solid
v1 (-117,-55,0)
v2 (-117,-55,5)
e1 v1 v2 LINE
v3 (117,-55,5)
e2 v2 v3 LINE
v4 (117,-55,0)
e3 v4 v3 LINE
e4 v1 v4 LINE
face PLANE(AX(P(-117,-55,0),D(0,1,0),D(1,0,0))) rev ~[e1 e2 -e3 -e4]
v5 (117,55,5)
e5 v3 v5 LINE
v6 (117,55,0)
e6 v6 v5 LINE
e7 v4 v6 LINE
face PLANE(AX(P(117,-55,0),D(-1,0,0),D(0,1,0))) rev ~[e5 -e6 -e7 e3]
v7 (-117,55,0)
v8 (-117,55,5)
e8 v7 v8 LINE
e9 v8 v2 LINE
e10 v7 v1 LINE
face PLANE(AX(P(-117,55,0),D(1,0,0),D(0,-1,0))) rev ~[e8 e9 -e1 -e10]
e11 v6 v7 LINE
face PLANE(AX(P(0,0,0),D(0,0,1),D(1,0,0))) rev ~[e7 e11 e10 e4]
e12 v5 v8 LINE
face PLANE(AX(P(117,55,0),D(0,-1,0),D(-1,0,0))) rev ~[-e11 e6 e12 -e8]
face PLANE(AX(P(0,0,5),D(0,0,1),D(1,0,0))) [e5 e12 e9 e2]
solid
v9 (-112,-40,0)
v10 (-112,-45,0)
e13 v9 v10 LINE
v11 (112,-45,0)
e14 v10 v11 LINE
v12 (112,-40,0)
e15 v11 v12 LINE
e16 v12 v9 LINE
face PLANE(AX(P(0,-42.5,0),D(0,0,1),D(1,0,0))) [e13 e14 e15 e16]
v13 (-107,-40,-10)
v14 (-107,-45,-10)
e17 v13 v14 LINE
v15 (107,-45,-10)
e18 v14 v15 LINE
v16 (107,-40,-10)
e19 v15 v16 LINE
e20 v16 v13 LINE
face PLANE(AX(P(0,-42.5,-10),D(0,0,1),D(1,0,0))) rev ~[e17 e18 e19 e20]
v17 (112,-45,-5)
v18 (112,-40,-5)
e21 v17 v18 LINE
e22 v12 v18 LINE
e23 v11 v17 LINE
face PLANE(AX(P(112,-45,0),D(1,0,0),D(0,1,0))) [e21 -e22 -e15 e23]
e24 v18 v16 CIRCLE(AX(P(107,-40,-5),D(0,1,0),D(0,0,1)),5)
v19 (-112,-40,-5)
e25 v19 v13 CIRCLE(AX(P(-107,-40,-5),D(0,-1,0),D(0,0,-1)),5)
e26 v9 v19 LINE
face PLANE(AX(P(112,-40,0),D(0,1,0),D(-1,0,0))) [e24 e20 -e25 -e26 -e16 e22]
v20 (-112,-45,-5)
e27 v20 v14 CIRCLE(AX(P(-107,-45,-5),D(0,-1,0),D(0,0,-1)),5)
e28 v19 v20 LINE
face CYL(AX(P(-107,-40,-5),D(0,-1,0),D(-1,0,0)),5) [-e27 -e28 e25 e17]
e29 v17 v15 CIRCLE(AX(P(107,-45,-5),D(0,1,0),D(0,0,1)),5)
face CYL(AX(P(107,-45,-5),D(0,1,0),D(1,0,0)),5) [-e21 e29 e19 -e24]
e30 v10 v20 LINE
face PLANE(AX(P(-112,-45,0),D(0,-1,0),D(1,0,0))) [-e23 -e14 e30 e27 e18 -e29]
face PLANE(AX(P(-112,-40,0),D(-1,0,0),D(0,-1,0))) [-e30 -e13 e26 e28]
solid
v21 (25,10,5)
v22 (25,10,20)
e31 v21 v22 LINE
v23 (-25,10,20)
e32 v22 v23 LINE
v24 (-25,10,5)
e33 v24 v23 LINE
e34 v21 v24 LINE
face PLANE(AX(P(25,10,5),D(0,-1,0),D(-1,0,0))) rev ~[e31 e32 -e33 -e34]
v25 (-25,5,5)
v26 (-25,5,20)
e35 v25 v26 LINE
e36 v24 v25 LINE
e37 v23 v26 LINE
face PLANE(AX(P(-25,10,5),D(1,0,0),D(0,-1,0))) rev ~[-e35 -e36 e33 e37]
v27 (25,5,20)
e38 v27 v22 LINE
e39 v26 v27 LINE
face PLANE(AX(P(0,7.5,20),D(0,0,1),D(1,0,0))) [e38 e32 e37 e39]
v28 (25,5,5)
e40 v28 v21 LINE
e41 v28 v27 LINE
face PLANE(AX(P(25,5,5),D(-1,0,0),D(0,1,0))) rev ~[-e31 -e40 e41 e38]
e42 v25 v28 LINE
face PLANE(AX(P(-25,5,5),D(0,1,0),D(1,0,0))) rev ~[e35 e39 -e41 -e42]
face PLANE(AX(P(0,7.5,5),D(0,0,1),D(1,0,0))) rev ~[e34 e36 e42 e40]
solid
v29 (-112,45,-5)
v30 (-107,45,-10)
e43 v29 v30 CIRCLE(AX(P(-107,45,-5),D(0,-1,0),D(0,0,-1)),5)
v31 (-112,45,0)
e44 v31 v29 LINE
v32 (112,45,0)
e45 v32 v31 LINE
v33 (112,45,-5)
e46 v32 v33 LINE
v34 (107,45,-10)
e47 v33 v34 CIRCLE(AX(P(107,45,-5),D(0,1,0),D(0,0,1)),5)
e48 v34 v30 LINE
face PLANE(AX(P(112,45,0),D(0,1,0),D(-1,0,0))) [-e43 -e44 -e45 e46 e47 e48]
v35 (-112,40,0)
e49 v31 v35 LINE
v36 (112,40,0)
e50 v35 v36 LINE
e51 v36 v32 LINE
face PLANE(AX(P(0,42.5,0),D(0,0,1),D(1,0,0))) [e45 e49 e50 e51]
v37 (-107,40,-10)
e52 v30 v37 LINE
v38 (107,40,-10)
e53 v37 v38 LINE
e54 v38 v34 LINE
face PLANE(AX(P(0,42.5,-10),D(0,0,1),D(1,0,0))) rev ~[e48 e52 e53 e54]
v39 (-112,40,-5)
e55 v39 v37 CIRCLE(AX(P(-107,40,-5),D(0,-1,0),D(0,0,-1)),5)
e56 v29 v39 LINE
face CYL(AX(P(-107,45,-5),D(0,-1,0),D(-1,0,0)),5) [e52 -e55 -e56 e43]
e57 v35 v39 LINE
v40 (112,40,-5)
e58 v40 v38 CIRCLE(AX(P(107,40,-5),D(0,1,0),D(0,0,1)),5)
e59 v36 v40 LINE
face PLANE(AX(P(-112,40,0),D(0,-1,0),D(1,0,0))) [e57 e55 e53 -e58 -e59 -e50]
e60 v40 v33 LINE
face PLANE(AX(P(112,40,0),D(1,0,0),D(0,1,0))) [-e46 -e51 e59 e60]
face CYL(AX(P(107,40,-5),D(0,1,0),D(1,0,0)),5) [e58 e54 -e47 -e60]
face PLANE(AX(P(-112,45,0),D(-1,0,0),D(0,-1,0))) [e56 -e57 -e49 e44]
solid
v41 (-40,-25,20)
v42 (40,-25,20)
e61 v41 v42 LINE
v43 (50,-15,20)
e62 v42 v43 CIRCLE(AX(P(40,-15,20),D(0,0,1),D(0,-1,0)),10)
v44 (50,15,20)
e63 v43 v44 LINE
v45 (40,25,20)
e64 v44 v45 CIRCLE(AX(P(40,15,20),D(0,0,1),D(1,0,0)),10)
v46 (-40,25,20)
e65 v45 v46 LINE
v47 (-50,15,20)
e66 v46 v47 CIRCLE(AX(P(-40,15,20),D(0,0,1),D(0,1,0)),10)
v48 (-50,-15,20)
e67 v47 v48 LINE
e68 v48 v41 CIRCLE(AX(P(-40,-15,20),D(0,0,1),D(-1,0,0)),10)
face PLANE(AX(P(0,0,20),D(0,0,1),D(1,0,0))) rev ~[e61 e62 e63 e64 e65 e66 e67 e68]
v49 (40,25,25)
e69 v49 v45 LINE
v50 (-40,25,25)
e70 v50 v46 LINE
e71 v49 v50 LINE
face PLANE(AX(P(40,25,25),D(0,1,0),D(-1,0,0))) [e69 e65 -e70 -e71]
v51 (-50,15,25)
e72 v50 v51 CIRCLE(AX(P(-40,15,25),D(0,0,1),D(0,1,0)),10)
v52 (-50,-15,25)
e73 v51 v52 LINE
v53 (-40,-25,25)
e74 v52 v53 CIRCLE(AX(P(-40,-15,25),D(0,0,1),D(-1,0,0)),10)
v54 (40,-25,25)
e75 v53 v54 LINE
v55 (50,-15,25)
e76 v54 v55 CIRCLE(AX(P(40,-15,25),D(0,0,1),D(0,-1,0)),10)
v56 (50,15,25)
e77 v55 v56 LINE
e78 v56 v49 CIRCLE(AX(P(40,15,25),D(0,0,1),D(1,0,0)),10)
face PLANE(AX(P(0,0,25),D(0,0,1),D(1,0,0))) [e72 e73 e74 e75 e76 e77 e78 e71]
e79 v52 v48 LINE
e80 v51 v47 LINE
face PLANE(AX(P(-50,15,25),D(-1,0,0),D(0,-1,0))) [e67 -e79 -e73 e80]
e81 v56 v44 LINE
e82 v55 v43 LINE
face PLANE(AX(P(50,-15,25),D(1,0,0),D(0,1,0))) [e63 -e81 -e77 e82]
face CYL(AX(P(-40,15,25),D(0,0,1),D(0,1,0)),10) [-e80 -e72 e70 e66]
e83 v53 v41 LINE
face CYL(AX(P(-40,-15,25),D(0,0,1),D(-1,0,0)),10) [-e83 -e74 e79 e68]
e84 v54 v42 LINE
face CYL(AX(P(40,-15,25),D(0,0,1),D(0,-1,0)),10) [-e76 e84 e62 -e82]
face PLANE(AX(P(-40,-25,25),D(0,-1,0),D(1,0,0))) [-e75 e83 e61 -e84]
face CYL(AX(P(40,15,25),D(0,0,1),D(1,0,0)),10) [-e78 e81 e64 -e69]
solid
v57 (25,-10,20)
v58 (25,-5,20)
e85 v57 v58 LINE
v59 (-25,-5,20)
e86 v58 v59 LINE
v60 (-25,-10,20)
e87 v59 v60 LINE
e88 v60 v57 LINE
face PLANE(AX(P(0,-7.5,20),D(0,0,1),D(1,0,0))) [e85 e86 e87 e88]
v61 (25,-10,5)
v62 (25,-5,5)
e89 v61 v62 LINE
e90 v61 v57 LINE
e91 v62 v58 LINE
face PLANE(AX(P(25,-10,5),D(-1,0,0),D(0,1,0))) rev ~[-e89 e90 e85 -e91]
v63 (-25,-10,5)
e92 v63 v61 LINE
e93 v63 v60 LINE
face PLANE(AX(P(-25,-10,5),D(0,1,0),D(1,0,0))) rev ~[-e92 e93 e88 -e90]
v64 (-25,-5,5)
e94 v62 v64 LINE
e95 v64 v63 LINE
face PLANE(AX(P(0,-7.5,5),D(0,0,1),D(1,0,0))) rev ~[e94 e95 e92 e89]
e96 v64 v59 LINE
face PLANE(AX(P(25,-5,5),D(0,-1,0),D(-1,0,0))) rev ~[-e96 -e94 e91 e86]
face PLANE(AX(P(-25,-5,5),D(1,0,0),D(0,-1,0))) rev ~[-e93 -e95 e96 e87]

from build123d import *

# Parameters (mm, degrees)
F1_DEPTH  = 5
F7_DEPTH  = 10
F8_R      = 5
F8_2_R    = 5
F9_DEPTH  = 15
F10_DEPTH = 5


# Not quite as in the source:
# - a feature names something its author has since deleted; it is built from what else it names


with BuildPart() as f1:
    # F0 (on Top) → F1 (new body)
    with BuildSketch(Plane.XY):
        Polygon((117, 55), (0, 55), (-117, 55), (-117, -55), (117, -55), align=None)
    extrude(amount=F1_DEPTH)


with BuildPart() as f7:
    # F2 (on Top) → F7 (new body)
    with BuildSketch(Plane.XY):
        Polygon((-112, -40), (-112, -45), (0, -45), (112, -45), (112, -40), align=None)
    extrude(amount=-F7_DEPTH)

    # F8
    f8_edges = [f7.edges().sort_by_distance(p)[0] for p in [
        (-112, -42.5, -10),
        (112, -42.5, -10),
    ]]
    fillet(f8_edges, radius=F8_R)


with BuildPart() as f7b:
    # F2 (on Top) → F7, piece 2 (new body)
    with BuildSketch(Plane.XY):
        Polygon((112, 45), (0, 45), (-112, 45), (-112, 40), (112, 40), align=None)
    extrude(amount=-F7_DEPTH)

    # F8#2
    f8_2_edges = [f7b.edges().sort_by_distance(p)[0] for p in [
        (112, 42.5, -10),
        (-112, 42.5, -10),
    ]]
    fillet(f8_2_edges, radius=F8_2_R)


with BuildPart() as f9:
    # F6 (on offset) → F9 (new body)
    with BuildSketch(Plane.XY.offset(5)):
        Polygon((25, -10), (25, -5), (0, -5), (-25, -5), (-25, -10), align=None)
    extrude(amount=F9_DEPTH)


with BuildPart() as f9b:
    # F6 (on offset) → F9, piece 2 (new body)
    with BuildSketch(Plane.XY.offset(5)):
        Polygon((-25, 5), (0, 5), (25, 5), (25, 10), (-25, 10), align=None)
    extrude(amount=F9_DEPTH)


with BuildPart() as f10:
    # F4 (on offset) → F10 (new body)
    with BuildSketch(Plane.XY.offset(25)):
        with BuildLine():
            Line((40, 25), (0, 25))
            Line((0, 25), (-40, 25))
            ThreePointArc((-40, 25), (-47.0710678119, 22.0710678119), (-50, 15))
            Line((-50, 15), (-50, -15))
            ThreePointArc((-50, -15), (-47.0710678119, -22.0710678119), (-40, -25))
            Line((-40, -25), (40, -25))
            ThreePointArc((40, -25), (47.0710678119, -22.0710678119), (50, -15))
            Line((50, -15), (50, 15))
            ThreePointArc((50, 15), (47.0710678119, 22.0710678119), (40, 25))
        make_face()
    extrude(amount=-F10_DEPTH)


solid = Compound([f1.part, f7.part, f7b.part, f9.part, f9b.part, f10.part])
